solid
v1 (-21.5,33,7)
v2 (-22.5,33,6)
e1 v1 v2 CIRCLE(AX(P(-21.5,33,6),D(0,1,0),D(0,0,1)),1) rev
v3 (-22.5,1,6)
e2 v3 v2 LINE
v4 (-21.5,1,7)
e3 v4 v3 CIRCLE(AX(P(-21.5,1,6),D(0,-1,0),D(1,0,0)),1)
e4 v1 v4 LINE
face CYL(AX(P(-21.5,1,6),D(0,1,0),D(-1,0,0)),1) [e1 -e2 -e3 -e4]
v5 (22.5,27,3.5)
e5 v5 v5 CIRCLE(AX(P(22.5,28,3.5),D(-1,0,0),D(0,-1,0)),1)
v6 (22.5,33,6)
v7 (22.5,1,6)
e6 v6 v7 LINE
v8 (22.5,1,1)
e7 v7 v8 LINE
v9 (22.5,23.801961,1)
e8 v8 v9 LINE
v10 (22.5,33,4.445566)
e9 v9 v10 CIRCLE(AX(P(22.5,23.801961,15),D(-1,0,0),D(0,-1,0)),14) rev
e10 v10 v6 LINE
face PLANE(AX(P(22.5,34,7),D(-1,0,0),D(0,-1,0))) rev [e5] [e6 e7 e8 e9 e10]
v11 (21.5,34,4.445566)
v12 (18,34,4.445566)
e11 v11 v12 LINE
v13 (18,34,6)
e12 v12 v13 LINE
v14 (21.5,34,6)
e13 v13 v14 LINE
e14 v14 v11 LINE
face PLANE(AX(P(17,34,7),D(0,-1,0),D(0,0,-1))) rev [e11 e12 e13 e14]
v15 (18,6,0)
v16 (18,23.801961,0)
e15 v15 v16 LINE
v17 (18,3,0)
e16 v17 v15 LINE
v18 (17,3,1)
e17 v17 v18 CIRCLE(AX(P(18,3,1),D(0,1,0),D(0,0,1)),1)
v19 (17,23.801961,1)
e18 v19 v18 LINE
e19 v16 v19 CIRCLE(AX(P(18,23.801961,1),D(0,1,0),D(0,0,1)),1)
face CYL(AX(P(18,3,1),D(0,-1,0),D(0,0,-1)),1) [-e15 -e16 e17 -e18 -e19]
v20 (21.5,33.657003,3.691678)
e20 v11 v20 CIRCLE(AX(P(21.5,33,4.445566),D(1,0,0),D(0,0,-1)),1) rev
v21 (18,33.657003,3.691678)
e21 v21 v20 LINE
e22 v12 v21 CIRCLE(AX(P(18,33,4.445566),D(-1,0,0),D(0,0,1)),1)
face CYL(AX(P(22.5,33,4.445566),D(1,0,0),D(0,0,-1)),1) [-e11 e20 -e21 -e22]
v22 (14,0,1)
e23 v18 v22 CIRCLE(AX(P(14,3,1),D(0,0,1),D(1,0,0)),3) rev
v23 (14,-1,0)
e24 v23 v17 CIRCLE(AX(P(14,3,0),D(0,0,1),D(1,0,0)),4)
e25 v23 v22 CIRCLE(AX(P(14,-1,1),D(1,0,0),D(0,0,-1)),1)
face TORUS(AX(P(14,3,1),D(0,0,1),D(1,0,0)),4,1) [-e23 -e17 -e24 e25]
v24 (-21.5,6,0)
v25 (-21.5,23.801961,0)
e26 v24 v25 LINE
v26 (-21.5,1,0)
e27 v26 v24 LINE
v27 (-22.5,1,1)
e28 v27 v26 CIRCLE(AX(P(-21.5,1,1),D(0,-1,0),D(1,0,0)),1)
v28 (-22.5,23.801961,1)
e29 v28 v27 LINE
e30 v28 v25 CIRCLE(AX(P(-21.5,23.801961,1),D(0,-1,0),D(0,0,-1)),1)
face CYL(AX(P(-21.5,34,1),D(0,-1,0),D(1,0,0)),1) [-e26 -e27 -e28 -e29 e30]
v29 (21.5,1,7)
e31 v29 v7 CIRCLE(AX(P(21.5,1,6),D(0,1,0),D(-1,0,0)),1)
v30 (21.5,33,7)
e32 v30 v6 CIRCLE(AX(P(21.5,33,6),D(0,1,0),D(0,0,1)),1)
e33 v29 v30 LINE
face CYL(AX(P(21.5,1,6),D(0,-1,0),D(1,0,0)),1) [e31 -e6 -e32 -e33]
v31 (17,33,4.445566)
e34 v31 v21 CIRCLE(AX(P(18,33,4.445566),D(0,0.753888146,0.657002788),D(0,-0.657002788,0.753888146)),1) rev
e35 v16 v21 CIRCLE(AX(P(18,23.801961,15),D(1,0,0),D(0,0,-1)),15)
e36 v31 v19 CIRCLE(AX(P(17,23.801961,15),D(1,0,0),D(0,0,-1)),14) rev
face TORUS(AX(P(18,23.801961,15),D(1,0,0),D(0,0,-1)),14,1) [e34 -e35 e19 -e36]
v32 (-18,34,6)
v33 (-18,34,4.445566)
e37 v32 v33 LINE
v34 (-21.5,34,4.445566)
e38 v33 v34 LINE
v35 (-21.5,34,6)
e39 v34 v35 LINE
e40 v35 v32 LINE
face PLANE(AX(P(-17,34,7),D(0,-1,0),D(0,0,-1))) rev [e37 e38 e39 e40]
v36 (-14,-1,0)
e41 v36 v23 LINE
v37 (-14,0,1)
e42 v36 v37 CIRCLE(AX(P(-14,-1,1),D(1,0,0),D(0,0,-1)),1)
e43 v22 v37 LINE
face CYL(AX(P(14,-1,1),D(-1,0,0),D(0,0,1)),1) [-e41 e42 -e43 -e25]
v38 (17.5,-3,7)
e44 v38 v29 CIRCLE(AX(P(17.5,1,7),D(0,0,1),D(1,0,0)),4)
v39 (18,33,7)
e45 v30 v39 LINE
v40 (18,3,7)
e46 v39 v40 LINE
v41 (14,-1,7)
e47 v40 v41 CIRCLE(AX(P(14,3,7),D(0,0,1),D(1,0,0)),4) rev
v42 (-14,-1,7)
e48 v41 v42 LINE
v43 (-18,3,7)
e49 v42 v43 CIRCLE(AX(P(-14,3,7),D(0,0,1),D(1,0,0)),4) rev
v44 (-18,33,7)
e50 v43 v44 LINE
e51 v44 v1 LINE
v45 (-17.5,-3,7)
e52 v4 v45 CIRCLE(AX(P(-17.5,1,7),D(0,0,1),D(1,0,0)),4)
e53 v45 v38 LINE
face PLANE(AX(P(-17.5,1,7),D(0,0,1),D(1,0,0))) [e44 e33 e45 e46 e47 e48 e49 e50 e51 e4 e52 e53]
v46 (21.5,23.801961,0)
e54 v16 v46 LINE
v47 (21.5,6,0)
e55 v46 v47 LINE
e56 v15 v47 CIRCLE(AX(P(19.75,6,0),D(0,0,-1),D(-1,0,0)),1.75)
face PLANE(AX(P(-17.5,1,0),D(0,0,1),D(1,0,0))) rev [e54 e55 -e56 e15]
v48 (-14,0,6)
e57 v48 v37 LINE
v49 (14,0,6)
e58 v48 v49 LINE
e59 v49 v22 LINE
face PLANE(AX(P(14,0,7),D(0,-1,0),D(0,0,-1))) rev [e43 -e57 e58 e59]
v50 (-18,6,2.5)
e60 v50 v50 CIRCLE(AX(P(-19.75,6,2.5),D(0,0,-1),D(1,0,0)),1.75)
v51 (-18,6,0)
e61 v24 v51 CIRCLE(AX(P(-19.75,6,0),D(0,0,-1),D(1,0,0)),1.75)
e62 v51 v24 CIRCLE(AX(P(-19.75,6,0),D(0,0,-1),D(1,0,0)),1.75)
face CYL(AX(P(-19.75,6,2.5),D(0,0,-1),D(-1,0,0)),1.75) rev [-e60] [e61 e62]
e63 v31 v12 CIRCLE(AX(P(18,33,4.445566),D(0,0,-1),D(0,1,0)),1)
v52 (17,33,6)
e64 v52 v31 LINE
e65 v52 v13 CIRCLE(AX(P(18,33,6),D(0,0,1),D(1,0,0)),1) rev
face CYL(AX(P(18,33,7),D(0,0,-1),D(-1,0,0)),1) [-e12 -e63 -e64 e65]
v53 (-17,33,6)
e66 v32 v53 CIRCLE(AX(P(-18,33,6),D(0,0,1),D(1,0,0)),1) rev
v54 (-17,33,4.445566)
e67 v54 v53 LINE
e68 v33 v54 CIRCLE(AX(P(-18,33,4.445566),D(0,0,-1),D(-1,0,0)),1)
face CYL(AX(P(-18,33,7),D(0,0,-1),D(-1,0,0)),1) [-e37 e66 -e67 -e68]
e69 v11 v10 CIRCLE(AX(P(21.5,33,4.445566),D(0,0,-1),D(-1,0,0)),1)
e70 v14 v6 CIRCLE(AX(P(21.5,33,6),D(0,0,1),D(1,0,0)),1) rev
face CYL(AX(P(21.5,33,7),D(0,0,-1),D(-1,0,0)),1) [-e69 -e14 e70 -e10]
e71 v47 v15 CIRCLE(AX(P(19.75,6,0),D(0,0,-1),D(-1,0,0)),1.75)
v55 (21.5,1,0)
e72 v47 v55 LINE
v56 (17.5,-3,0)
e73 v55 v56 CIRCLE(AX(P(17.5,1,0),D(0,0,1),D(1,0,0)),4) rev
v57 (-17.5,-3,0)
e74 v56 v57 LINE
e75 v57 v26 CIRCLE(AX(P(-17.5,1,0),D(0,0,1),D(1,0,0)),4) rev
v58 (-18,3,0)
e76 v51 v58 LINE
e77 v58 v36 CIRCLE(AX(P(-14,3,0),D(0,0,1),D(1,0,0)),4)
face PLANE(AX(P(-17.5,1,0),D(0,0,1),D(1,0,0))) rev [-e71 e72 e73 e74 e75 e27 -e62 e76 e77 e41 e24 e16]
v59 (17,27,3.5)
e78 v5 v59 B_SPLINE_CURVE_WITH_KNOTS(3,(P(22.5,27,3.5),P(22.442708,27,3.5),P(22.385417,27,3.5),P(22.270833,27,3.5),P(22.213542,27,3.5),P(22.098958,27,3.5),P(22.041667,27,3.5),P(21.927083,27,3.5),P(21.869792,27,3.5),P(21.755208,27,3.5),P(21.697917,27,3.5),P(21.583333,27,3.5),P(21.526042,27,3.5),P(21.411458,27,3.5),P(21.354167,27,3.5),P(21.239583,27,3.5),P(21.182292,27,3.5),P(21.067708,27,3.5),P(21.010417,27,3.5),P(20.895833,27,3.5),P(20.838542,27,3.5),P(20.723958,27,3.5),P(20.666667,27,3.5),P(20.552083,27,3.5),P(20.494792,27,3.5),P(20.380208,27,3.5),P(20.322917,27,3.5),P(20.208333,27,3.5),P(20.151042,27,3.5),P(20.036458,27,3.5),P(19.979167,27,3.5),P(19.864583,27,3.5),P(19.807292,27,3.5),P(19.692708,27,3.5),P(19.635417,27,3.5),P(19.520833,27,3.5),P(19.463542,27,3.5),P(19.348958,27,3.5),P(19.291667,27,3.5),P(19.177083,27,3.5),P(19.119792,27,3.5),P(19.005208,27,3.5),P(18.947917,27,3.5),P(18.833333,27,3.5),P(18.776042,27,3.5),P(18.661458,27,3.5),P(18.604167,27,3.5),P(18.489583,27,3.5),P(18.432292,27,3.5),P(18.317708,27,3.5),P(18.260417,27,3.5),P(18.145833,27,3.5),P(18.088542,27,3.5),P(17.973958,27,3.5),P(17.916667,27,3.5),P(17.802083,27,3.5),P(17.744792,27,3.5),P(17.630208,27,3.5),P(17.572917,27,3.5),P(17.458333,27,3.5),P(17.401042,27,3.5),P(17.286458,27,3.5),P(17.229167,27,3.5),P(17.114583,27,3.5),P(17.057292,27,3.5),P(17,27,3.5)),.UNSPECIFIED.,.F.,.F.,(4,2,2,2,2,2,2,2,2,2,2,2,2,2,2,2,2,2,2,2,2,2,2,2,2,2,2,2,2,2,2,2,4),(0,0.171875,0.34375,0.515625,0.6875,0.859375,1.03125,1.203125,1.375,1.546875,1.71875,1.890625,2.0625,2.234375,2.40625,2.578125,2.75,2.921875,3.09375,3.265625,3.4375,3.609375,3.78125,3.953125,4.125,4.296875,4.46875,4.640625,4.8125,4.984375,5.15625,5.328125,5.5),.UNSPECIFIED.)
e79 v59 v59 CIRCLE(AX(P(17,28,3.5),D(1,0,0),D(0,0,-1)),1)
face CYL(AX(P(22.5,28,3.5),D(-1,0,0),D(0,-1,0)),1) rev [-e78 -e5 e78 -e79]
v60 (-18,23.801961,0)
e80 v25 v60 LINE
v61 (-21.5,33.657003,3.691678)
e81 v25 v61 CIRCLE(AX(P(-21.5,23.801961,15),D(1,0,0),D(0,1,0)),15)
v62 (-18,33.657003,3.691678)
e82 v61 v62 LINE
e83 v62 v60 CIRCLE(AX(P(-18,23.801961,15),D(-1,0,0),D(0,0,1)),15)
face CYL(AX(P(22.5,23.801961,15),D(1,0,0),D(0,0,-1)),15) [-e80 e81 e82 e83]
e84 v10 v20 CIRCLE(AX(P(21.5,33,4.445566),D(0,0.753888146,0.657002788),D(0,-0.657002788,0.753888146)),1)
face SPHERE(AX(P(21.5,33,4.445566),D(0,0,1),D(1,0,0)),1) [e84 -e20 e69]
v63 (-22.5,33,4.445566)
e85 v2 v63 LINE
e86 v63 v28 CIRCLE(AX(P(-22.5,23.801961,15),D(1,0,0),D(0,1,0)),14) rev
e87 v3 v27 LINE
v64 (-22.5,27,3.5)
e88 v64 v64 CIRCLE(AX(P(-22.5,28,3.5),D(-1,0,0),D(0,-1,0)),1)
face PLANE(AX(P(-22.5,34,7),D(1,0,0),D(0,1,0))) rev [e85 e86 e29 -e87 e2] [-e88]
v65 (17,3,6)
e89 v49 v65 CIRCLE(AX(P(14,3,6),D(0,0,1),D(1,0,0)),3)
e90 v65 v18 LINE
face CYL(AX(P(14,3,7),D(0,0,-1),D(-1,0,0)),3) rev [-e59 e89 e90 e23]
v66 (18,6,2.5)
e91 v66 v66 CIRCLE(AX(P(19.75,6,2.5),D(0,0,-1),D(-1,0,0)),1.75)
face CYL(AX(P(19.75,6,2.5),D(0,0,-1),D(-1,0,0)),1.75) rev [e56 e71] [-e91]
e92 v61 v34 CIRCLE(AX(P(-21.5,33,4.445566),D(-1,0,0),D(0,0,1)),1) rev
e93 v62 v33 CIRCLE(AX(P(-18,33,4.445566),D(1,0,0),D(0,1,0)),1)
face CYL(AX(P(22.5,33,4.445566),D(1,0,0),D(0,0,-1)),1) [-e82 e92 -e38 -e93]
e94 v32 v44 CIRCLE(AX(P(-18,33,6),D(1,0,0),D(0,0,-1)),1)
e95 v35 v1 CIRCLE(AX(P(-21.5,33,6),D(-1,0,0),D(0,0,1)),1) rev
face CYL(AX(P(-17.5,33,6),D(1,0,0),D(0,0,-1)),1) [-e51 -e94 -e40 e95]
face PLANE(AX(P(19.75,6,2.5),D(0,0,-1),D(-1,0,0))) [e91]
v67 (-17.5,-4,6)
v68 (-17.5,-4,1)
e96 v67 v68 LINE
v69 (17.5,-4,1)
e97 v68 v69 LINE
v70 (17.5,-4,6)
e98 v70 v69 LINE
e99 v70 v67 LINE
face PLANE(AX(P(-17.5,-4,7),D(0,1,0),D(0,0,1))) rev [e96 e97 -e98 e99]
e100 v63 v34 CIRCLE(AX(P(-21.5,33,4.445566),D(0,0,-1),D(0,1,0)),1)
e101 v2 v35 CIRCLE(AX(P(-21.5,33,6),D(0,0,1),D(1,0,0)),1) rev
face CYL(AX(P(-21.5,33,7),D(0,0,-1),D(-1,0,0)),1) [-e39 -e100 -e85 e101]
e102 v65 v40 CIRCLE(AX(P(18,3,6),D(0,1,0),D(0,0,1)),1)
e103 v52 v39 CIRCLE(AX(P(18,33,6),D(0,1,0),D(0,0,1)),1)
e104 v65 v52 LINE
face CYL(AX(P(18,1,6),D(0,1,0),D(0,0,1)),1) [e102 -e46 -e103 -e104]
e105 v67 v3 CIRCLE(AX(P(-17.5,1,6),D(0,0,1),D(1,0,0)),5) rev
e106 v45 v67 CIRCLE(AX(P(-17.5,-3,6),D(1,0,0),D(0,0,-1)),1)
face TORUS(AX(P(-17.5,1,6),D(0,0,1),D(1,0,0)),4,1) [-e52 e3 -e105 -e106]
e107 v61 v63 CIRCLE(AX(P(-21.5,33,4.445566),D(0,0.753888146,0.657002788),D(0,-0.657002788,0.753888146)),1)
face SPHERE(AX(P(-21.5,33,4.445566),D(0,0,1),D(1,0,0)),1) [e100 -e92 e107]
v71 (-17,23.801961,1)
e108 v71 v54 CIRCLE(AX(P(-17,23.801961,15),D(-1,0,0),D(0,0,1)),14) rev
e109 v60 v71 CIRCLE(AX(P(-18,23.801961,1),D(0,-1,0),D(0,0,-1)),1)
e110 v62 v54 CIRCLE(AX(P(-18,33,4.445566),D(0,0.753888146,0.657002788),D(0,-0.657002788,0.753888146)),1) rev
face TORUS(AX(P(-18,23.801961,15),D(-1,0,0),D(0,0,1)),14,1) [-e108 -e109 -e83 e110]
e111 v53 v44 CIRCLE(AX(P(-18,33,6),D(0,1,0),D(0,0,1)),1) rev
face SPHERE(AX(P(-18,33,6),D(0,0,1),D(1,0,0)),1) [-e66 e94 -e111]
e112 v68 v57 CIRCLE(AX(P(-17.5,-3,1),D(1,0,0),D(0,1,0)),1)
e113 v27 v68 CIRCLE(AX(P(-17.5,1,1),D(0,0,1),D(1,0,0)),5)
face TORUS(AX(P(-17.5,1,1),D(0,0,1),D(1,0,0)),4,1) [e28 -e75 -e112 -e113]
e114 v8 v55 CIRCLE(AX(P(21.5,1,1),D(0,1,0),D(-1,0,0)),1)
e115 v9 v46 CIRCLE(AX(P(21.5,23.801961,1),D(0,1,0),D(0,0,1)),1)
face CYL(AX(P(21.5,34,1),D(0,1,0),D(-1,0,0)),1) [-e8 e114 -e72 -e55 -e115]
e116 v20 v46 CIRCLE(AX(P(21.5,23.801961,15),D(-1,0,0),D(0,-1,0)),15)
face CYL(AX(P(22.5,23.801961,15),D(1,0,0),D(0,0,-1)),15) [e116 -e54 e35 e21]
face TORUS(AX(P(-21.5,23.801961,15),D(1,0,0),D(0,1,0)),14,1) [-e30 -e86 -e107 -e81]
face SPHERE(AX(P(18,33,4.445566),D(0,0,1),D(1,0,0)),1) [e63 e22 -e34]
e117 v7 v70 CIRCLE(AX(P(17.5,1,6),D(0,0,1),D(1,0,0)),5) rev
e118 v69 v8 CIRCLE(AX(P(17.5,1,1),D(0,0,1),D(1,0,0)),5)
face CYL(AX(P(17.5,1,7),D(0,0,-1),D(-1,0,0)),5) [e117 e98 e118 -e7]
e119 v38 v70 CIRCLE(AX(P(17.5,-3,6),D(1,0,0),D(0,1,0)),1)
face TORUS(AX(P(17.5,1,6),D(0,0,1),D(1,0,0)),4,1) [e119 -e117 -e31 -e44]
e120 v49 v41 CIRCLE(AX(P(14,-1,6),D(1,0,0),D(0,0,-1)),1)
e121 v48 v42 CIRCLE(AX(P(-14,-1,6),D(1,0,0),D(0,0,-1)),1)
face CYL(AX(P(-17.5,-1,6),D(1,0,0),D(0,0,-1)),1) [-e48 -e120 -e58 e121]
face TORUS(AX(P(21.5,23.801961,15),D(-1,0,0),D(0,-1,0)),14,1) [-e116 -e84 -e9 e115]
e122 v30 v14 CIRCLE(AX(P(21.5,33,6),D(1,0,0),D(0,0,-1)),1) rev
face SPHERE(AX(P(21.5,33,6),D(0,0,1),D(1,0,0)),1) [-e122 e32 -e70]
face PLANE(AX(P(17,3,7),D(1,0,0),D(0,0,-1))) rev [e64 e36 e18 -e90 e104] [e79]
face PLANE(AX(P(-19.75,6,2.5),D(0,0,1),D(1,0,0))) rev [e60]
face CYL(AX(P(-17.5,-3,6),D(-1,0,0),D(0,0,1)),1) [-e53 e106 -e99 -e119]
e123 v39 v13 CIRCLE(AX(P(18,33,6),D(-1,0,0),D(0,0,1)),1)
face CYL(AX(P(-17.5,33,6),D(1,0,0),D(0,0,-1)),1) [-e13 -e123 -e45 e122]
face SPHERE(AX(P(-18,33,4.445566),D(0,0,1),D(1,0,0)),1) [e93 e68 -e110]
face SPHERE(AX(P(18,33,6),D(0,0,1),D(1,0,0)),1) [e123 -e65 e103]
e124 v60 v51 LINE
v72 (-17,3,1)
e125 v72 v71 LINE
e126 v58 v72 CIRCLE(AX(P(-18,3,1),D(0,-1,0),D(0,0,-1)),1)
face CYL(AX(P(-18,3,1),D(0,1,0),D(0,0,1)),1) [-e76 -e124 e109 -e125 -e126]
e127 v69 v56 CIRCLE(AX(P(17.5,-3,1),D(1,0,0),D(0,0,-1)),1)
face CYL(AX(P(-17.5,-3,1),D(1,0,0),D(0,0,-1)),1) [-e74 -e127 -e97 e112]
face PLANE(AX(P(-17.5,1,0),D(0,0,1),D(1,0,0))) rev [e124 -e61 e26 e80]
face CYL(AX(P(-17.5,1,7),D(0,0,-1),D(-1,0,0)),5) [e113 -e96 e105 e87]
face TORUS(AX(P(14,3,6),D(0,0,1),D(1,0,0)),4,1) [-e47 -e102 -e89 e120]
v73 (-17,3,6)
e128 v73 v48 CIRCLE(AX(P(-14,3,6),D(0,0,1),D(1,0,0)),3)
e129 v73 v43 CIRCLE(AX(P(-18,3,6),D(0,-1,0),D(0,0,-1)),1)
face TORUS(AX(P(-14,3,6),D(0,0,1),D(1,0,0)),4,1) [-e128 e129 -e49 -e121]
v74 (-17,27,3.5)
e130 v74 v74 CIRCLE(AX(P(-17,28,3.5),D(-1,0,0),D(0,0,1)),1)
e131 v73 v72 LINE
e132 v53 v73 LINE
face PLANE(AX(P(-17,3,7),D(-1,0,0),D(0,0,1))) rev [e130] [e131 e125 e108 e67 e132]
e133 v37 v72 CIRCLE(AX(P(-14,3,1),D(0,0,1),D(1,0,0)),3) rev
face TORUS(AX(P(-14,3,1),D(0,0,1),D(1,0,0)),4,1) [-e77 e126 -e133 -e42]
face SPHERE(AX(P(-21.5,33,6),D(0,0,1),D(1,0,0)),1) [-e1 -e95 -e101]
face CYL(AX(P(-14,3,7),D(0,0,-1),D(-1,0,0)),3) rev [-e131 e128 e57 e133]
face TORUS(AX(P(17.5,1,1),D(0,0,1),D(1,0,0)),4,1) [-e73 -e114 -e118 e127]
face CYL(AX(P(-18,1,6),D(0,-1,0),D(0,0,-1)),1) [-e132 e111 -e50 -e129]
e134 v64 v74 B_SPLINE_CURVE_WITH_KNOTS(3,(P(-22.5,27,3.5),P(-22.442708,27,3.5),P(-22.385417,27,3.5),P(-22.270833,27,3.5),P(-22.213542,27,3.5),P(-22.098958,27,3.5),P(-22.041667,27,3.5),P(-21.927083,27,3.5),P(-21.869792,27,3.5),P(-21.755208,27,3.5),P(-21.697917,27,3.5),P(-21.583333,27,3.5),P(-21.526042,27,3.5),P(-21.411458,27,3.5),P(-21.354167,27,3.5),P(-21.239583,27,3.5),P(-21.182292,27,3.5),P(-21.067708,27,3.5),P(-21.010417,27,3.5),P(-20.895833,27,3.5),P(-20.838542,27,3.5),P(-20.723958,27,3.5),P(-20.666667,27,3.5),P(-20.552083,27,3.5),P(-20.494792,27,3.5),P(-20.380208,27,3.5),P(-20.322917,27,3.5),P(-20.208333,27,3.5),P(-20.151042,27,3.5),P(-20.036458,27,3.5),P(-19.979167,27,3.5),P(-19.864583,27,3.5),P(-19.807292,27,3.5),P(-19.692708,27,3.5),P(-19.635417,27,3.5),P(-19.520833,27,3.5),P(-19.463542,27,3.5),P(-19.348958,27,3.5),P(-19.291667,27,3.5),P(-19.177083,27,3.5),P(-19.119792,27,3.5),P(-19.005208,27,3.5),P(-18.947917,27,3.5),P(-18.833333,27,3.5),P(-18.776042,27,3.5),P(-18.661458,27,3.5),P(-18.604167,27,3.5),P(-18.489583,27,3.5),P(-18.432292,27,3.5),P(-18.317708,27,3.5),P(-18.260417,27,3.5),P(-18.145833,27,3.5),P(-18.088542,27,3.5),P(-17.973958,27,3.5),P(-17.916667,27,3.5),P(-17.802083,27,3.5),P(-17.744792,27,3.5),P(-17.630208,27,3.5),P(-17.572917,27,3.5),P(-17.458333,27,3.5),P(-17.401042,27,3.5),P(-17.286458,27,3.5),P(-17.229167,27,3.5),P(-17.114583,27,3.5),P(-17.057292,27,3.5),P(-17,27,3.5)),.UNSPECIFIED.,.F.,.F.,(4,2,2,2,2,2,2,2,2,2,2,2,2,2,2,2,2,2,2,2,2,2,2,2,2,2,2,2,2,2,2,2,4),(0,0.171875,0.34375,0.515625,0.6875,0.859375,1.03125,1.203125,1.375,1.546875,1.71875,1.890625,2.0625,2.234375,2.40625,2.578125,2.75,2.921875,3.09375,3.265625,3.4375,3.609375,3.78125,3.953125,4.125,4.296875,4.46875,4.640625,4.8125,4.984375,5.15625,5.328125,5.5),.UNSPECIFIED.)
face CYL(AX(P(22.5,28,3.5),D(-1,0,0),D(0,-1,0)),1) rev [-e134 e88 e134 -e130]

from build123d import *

# Parameters (mm, degrees)
EXTRUDE_1_DEPTH     = 7
SKETCH_3_R          = 1
CUT_EXTRUDE_2_DEPTH = 57.833088954
SKETCH_4_R          = 1.75
CUT_EXTRUDE_3_DEPTH = 2.5
CUT_EXTRUDE_1_DEPTH = 57.833088954
FILLET_2_R          = 15
FILLET_3_R          = 1


# Some blends are built 0.0001 mm under size
with BuildPart() as part:
    # 草图1 → 凸台-拉伸1 (new body)
    with BuildSketch(Plane.XY):
        with BuildLine():
            Line((14, 0), (-14, 0))
            ThreePointArc((-14, 0), (-16.121320344, 0.878679656), (-17, 3))
            Line((-17, 3), (-17, 34))
            Line((-17, 34), (-22.5, 34))
            Line((-22.5, 34), (-22.5, 1))
            ThreePointArc((-22.5, 1), (-21.035533906, -2.535533906), (-17.5, -4))
            Line((-17.5, -4), (17.5, -4))
            ThreePointArc((17.5, -4), (21.035533906, -2.535533906), (22.5, 1))
            Line((22.5, 1), (22.5, 34))
            Line((22.5, 34), (17, 34))
            Line((17, 34), (17, 3))
            ThreePointArc((17, 3), (16.121320344, 0.878679656), (14, 0))
        make_face()
    extrude(amount=EXTRUDE_1_DEPTH)

    # 草图3 → 切除-拉伸2 (cut, through all)
    with BuildSketch(Plane.ZY.offset(22.5)):
        with Locations(Location((3.5, 28, 0), (0, 0, 270))):
            Circle(SKETCH_3_R)
    extrude(amount=-CUT_EXTRUDE_2_DEPTH, mode=Mode.SUBTRACT)

    # 草图4 → 切除-拉伸3 (cut)
    with BuildSketch(Plane(origin=(0, 0, 0), x_dir=(-1, 0, 0), z_dir=(0, 0, -1))):
        with Locations((-19.75, 6)):
            Circle(SKETCH_4_R)
        with Locations(Location((19.75, 6, 0), (0, 0, 180))):
            Circle(SKETCH_4_R)
    extrude(amount=-CUT_EXTRUDE_3_DEPTH, mode=Mode.SUBTRACT)

    # 草图2 → 切除-拉伸1 (cut, through all)
    with BuildSketch(Plane.ZY.offset(22.5)):
        Polygon((0, 30), (4, 34), (7, 34), (7, 35.188575271), (0, 35.188575271), align=None)
    extrude(amount=-CUT_EXTRUDE_1_DEPTH, mode=Mode.SUBTRACT)

    # 圆角2
    # the kernel refuses this fillet: 15 mm, written as the material it takes off along each edge
    with BuildSketch(Plane(origin=(-37.995097568, 30, 0), x_dir=(0, -1, 0), z_dir=(1, 0, 0)), Plane(origin=(1.504902432, 30, 0), x_dir=(0, -1, 0), z_dir=(1, 0, 0))) as fillet_2_piece_1:
        with BuildLine():
            CenterArc((6.198039027, -15), FILLET_2_R, 90, 42.833428066)
            Line((-4, -4), (-4.203960781, -3.78))
            ThreePointArc((-4.203960781, -3.78), (-2.212132034, -1.787867966), (-0.212132034, 0.212132034))
            Line((-0.212132034, 0.212132034), (0, 0.3))
            Line((0, 0.3), (6.198039027, 0.3))
            Line((6.198039027, 0.3), (6.198039027, 0))
        make_face()
    extrude(amount=36.490195136, mode=Mode.SUBTRACT)

    # 圆角3
    fillet_3_edges = [part.edges().sort_by_distance(p)[0] for p in [
        (-17, 13.400980486, 0),
        (-16.121320344, 0.878679656, 0),
        (-21.035533906, -2.535533906, 7),
        (0, 0, 0),
        (16.121320344, 0.878679656, 0),
        (22.5, 12.400980486, 0),
        (21.035533906, -2.535533906, 0),
        (0, -4, 0),
        (-21.035533906, -2.535533906, 0),
        (0, -4, 7),
        (-17, 34, 5.5),
        (21.035533906, -2.535533906, 7),
        (17, 34, 5.5),
        (22.5, 34, 5.5),
        (-22.5, 34, 5.5),
        (22.5, 17.5, 7),
        (19.75, 34, 7),
        (17, 18.5, 7),
        (16.121320344, 0.878679656, 7),
        (0, 0, 7),
        (-16.121320344, 0.878679656, 7),
        (-17, 18.5, 7),
        (-19.75, 34, 7),
        (19.75, 34, 4),
        (-19.75, 34, 4),
        (17, 13.400980486, 0),
        (17, 29.279186548, 1.035759956),
        (-22.5, 12.400980486, 0),
        (22.5, 29.279186548, 1.035759956),
        (-17, 29.279186548, 1.035759956),
        (-22.5, 29.279186548, 1.035759956),
        (-22.5, 17.5, 7),
    ]]
    fillet(fillet_3_edges, radius=FILLET_3_R - 0.0001)  # a hair under: the kernel refuses the full size


solid = part.part
